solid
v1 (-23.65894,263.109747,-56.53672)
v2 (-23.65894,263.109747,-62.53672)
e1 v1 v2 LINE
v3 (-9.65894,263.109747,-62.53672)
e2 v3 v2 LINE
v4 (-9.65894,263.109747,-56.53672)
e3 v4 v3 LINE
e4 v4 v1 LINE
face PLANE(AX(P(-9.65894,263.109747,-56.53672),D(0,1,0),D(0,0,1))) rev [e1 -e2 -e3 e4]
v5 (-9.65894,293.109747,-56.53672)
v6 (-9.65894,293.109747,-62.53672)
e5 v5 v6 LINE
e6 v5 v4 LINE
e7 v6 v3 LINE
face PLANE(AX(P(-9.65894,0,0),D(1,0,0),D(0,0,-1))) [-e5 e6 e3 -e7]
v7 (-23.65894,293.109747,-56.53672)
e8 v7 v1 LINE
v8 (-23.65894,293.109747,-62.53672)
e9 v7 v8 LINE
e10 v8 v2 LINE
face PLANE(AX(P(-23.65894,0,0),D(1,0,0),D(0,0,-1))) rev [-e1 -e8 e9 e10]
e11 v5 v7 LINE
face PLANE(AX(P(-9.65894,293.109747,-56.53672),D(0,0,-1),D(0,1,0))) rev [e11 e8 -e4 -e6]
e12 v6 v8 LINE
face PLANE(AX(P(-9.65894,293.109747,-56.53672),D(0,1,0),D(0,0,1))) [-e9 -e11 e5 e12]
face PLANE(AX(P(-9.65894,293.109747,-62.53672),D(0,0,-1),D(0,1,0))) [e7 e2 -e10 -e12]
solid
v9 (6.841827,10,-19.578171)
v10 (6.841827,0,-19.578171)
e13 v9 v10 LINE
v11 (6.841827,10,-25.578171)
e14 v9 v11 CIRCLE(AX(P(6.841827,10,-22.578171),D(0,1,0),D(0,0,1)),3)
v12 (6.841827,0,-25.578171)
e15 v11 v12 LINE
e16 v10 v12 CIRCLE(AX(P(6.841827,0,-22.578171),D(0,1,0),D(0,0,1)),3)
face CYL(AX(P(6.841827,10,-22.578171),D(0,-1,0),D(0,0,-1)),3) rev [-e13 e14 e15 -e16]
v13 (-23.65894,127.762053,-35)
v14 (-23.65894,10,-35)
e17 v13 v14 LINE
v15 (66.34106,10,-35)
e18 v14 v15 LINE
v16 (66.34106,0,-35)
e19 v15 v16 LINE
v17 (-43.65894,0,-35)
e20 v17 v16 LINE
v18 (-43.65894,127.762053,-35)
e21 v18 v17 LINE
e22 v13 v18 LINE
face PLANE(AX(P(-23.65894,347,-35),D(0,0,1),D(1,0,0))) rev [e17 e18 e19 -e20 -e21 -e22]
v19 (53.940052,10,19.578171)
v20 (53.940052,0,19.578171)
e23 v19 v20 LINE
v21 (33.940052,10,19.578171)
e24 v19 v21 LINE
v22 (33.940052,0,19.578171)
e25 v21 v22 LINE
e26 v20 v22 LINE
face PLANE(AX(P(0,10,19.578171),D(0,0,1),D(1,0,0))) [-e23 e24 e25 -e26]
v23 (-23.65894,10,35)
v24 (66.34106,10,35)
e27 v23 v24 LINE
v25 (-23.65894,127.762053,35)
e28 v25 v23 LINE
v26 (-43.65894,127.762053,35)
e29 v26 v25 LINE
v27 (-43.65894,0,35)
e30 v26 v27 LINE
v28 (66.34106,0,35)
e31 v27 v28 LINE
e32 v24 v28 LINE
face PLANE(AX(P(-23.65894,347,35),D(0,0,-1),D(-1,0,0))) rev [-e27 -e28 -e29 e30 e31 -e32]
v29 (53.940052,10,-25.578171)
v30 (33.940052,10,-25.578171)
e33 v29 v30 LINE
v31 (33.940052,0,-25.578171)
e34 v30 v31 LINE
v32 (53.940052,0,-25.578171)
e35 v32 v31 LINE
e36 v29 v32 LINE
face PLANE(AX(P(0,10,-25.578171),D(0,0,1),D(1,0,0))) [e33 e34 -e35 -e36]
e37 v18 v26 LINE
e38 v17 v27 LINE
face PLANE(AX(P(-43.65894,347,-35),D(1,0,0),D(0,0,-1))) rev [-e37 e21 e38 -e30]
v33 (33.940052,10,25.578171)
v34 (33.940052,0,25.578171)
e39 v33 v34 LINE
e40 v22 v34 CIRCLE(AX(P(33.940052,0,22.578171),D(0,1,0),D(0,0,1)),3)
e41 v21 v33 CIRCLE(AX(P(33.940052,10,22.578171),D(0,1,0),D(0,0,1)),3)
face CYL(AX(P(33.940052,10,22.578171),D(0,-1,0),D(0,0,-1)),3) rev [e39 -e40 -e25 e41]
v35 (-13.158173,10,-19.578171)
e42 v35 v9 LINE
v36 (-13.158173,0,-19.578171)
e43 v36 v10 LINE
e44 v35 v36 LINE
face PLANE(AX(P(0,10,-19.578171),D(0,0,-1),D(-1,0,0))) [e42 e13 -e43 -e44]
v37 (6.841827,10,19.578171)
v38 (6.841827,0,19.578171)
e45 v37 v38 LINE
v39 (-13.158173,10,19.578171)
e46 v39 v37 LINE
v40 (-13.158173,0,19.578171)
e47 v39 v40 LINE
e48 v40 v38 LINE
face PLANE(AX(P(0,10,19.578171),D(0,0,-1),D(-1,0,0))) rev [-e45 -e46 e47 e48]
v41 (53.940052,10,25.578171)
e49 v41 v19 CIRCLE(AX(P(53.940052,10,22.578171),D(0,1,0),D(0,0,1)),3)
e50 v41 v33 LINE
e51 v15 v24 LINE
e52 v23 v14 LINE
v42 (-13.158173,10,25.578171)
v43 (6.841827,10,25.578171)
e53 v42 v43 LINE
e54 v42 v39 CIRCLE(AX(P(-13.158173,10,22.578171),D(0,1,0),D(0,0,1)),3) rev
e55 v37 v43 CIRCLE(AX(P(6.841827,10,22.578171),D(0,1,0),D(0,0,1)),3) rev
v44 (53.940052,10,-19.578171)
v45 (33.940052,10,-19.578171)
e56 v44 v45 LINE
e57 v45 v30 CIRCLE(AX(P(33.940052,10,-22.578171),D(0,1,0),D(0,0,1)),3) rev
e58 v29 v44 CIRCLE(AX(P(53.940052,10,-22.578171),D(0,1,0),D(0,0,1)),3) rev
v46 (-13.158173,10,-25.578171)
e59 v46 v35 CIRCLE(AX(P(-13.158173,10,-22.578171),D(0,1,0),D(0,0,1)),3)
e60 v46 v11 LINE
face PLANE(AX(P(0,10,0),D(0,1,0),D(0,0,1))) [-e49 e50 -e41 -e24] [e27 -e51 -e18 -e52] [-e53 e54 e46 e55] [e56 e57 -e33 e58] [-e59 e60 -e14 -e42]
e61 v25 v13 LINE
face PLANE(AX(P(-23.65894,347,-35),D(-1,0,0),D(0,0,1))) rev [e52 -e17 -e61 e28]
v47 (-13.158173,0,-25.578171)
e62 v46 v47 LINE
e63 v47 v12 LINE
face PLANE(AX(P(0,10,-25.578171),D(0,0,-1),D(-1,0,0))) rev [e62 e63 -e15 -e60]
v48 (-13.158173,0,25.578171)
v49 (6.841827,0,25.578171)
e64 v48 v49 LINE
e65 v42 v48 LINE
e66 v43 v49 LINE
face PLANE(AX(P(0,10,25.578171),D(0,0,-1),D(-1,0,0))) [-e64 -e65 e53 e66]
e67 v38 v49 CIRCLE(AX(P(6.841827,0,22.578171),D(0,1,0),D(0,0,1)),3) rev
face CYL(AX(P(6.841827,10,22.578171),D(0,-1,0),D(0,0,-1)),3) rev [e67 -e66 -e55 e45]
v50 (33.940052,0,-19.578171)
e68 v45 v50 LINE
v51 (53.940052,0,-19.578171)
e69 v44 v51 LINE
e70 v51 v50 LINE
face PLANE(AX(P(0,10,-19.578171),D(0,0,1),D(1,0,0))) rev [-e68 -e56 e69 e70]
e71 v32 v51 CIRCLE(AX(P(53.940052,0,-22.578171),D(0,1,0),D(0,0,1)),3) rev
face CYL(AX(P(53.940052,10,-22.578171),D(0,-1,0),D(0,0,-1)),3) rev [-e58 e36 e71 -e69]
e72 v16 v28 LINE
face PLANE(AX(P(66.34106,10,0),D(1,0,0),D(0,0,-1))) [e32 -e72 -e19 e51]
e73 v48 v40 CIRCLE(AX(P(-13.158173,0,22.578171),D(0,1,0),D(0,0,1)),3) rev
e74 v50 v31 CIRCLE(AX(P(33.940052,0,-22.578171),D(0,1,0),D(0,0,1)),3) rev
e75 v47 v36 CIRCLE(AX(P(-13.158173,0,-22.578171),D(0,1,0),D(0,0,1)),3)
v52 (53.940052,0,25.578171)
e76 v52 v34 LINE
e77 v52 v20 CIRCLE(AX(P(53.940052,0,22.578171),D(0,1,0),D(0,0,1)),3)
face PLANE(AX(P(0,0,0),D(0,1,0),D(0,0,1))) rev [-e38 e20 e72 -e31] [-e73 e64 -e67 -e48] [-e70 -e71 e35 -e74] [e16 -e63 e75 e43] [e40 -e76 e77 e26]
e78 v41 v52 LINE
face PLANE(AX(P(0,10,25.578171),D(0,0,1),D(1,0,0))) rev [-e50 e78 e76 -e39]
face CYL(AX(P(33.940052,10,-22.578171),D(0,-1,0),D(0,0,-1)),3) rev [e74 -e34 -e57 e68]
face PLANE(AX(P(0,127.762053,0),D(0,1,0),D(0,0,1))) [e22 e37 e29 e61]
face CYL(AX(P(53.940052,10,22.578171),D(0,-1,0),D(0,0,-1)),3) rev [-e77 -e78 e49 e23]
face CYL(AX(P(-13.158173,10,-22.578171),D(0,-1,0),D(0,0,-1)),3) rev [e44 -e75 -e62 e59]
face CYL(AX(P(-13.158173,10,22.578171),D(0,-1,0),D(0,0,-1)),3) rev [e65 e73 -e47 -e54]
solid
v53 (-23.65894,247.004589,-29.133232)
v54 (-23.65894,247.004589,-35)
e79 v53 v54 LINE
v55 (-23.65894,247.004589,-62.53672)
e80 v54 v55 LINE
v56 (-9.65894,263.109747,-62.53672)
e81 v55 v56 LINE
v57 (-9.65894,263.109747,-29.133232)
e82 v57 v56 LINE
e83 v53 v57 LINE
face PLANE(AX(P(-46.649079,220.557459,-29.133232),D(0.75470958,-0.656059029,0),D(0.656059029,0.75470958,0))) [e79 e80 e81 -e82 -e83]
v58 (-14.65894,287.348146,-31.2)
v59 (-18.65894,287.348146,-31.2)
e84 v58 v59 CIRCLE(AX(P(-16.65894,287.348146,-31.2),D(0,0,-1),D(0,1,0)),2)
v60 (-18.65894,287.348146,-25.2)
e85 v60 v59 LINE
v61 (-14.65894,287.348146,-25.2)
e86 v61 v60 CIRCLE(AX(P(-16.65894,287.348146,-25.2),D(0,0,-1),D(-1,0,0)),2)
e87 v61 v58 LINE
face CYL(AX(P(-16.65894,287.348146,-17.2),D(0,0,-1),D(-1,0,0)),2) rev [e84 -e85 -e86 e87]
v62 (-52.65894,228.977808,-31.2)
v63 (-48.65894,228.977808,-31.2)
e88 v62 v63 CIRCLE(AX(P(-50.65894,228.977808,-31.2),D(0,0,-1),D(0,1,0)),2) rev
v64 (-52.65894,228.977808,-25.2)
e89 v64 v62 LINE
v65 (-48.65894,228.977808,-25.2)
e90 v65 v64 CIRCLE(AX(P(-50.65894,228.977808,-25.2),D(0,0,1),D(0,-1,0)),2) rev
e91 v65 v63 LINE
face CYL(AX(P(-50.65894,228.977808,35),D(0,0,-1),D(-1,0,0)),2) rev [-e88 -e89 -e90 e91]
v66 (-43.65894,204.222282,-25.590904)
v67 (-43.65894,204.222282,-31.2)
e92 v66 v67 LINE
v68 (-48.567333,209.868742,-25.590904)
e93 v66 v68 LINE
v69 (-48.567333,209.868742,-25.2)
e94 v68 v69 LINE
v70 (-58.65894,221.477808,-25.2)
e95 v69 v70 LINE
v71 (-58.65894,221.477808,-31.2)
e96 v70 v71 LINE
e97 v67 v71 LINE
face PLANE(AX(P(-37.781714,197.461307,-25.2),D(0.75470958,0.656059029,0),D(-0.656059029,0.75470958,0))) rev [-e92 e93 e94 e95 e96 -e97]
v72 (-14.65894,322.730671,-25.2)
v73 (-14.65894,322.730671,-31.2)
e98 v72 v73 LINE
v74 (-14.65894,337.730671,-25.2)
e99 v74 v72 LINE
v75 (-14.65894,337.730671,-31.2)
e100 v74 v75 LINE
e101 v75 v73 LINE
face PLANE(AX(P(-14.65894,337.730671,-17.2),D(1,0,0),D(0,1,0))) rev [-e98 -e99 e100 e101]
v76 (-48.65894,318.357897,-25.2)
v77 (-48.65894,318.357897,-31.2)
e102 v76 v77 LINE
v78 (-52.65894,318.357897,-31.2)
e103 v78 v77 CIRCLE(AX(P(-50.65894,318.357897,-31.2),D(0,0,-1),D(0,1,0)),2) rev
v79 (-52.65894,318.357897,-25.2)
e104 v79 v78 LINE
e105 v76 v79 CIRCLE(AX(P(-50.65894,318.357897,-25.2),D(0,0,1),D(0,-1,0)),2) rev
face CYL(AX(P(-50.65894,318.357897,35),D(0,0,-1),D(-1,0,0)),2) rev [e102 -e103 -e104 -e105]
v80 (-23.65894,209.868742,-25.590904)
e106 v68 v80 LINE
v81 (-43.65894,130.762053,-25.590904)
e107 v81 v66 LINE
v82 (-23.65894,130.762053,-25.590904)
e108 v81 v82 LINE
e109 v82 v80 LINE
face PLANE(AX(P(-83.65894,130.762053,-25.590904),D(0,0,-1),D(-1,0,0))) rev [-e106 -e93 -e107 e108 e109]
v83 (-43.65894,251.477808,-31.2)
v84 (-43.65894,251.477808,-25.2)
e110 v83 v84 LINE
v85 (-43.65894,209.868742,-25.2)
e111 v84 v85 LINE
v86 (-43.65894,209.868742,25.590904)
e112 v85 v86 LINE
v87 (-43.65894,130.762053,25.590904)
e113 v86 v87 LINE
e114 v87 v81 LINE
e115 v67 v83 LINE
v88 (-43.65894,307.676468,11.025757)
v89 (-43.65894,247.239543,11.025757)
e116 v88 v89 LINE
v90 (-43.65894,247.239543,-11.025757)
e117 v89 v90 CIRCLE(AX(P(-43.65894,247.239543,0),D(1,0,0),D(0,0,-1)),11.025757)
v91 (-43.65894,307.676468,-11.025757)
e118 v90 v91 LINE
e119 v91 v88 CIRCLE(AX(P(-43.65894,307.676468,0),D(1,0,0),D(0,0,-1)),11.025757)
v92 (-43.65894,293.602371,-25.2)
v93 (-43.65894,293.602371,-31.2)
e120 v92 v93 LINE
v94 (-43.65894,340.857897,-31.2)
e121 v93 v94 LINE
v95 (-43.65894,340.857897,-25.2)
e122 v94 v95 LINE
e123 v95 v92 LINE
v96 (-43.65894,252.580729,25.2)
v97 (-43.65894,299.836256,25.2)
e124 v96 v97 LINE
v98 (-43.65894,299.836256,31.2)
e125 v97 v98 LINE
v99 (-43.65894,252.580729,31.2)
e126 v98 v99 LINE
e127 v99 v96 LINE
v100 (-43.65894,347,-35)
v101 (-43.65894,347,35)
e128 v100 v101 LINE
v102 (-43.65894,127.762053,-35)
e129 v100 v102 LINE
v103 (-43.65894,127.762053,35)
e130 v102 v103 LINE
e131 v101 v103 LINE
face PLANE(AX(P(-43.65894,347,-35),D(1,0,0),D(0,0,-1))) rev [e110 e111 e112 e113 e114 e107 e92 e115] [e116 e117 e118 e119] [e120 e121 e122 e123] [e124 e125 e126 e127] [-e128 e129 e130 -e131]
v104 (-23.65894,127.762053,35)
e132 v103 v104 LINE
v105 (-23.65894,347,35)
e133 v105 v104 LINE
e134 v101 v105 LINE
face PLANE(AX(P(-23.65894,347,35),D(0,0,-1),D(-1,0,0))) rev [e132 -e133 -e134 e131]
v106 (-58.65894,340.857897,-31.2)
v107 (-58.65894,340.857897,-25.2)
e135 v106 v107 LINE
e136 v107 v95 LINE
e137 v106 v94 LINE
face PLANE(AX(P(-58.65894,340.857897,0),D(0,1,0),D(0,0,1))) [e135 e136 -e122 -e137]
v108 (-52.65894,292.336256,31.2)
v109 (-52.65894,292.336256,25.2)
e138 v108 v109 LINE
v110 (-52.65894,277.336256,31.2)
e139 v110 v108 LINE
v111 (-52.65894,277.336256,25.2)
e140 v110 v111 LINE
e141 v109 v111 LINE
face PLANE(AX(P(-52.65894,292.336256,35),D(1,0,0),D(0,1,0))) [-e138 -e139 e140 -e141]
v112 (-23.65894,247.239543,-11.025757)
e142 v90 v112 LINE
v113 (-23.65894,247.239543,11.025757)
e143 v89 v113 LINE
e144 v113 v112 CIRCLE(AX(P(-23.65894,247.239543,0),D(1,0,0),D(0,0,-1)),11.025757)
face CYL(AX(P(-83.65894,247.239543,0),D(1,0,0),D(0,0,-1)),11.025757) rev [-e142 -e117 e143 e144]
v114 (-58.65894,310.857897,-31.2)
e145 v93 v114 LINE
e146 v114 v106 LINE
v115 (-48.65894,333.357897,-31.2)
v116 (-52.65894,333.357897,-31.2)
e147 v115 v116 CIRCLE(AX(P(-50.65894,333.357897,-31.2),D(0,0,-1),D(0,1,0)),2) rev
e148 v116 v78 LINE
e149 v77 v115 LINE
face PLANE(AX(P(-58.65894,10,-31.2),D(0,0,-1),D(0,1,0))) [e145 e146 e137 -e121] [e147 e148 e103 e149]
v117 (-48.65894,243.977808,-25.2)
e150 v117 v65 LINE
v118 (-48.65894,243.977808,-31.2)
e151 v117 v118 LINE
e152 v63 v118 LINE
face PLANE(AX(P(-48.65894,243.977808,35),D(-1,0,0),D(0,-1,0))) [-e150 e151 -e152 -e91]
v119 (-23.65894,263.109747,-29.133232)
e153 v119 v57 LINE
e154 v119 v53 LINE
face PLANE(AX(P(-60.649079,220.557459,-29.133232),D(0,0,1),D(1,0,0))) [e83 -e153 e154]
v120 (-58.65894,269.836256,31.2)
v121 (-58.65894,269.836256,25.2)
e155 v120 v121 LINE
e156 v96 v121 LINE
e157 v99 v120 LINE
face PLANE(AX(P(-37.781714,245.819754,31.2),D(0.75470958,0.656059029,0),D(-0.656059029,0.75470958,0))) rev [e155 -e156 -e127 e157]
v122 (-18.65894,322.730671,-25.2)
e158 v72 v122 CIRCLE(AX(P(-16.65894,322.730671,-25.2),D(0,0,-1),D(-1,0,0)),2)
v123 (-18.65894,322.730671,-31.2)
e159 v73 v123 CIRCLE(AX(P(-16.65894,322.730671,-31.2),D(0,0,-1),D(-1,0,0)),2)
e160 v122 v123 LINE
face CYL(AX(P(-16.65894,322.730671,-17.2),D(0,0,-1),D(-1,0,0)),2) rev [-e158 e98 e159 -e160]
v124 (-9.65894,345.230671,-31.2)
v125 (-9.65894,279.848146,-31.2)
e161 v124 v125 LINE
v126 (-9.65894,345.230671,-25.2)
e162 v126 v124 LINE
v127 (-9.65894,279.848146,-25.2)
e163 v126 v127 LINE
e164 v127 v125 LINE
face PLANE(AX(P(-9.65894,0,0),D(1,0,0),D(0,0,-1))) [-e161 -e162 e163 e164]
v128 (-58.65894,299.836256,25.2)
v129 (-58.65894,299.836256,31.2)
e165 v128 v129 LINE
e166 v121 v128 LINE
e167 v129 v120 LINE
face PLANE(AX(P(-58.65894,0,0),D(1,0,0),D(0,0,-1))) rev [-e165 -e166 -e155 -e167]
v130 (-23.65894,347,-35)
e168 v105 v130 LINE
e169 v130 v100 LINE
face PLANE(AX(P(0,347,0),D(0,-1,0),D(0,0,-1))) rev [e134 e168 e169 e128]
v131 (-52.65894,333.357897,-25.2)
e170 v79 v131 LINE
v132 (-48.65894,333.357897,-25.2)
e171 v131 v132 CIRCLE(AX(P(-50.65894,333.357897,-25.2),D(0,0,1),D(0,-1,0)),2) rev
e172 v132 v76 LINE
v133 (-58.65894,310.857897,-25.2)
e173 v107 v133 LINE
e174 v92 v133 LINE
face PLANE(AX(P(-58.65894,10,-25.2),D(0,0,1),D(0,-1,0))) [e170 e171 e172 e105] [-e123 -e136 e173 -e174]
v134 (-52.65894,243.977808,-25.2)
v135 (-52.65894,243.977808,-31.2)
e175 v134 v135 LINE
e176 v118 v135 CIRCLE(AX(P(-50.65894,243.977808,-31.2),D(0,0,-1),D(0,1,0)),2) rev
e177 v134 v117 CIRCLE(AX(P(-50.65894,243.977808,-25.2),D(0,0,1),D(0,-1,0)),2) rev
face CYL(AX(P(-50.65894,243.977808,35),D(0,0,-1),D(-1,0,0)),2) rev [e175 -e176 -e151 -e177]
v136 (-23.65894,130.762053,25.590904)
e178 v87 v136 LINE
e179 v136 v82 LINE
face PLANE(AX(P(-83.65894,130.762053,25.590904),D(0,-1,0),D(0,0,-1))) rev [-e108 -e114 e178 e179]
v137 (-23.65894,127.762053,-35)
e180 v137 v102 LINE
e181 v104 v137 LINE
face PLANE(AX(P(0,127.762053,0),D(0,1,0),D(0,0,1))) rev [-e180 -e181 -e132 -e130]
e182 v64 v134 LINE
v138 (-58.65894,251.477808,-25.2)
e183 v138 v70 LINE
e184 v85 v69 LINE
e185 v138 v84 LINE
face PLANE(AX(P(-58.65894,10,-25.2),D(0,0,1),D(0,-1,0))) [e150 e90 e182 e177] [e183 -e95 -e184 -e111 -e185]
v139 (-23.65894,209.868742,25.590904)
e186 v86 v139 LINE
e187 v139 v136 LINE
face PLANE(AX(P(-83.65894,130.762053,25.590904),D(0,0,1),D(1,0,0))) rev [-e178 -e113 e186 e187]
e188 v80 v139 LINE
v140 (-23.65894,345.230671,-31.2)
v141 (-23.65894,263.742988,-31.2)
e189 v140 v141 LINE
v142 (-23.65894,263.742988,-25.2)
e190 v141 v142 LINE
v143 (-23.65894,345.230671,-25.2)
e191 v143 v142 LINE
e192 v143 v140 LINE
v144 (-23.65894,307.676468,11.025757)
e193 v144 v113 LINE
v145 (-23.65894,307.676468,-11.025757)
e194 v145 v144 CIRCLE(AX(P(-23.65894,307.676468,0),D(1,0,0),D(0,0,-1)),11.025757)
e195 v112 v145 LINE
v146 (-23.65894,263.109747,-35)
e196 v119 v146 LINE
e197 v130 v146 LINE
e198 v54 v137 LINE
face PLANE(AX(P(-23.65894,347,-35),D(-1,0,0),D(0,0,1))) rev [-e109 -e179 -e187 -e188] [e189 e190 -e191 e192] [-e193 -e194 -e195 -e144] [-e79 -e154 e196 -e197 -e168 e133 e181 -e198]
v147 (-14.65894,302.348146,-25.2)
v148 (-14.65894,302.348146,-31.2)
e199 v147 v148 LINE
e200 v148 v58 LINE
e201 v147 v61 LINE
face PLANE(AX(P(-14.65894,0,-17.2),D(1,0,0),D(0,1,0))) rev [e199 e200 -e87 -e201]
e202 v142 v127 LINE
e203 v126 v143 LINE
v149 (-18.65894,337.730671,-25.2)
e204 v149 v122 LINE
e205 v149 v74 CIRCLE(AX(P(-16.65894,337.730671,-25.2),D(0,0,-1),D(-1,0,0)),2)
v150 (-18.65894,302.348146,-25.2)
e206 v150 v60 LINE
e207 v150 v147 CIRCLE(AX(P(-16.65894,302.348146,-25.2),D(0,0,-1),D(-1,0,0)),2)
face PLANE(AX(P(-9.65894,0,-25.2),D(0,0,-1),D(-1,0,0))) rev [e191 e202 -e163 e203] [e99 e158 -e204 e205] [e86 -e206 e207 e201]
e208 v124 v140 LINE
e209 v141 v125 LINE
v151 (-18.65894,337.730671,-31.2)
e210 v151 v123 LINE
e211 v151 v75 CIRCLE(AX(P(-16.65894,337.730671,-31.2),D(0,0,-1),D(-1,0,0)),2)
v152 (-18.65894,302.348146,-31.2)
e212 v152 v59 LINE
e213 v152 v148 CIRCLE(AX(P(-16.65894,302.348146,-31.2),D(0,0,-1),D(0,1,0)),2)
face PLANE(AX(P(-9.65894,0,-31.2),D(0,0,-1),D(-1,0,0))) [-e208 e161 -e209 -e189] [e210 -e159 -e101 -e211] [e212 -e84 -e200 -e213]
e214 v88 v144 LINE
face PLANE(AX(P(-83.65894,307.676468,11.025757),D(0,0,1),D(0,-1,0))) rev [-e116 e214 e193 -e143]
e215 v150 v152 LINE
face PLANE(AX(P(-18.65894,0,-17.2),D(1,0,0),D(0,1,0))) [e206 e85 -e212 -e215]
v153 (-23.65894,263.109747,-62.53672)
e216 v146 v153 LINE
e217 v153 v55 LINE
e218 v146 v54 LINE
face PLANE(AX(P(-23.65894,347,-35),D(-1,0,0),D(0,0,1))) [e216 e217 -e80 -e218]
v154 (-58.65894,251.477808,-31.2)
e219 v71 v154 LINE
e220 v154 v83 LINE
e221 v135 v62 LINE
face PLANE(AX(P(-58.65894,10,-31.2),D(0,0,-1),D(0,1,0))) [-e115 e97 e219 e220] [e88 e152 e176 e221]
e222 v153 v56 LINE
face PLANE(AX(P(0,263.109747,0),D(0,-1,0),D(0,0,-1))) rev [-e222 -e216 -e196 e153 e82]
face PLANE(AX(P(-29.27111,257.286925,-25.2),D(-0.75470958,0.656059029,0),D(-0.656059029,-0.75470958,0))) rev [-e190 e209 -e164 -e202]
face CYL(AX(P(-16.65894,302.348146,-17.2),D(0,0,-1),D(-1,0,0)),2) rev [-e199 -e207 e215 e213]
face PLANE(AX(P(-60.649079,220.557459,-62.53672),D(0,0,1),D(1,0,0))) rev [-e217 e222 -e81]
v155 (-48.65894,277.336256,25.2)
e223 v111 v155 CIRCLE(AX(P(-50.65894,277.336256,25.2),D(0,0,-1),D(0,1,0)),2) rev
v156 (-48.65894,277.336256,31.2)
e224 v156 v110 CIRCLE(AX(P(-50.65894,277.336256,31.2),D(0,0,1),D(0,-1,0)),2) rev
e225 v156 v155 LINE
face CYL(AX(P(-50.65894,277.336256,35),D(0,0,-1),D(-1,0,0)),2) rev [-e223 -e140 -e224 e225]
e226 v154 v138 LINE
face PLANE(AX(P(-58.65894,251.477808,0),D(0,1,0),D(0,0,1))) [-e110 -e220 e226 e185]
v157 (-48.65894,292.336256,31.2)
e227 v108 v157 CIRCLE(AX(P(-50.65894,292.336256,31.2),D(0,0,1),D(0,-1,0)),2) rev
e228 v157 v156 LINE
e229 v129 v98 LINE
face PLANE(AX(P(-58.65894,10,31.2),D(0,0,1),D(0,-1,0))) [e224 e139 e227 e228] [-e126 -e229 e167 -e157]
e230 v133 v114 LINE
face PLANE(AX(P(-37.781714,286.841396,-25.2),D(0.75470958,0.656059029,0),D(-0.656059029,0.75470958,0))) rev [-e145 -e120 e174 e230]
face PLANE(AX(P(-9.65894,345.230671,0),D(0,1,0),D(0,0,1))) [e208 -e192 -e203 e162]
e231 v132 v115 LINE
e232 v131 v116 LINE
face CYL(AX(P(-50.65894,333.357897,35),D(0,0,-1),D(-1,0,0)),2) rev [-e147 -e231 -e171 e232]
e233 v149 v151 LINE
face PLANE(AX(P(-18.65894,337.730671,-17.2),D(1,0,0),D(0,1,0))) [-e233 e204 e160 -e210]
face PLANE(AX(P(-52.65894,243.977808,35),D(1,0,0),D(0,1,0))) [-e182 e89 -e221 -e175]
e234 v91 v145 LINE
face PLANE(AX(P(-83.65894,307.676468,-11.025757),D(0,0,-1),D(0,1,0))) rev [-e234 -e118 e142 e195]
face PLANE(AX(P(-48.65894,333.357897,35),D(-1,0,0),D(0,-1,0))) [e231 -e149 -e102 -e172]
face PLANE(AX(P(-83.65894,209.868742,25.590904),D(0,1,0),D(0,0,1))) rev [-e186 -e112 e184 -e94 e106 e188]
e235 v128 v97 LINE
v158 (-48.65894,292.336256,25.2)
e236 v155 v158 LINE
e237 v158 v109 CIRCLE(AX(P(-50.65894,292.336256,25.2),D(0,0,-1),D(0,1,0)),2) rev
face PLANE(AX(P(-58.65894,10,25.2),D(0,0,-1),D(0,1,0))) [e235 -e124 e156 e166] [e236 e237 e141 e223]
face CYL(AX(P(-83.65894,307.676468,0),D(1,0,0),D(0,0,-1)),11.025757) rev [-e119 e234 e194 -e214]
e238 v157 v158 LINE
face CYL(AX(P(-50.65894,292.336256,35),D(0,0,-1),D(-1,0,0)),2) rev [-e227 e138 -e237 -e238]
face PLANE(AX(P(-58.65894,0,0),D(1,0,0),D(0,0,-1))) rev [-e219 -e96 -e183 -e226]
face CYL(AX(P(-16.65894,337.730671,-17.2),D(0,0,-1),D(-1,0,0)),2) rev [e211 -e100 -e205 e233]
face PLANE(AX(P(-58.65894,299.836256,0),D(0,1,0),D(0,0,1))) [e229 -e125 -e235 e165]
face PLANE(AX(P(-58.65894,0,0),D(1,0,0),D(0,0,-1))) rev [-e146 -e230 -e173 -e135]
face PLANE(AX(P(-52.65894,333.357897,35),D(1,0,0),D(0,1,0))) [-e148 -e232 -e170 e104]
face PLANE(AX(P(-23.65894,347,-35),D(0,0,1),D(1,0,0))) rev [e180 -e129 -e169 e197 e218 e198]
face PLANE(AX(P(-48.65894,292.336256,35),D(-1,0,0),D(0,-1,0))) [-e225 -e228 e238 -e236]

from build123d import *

# Parameters (mm, degrees)
SKETCH1_W               = 20
SKETCH1_H               = 70
SKETCH1_W_2             = 90
BOSS_EXTRUDE1_DEPTH     = 10
SKETCH1_3_W             = 20
SKETCH1_3_H             = 70
BOSS_EXTRUDE2_DEPTH     = 212
BOSS_EXTRUDE3_START     = -20
SKETCH2_W               = 6
SKETCH2_H               = 30
BOSS_EXTRUDE3_DEPTH     = 15
BOSS_EXTRUDE3_2_DEPTH   = 15
BOSS_EXTRUDE3_3_DEPTH   = 15
CUT_EXTRUDE3_DEPTH      = 353.433372815
CUT_EXTRUDE3_DEPTH_BACK = 127.2
SKETCH7_W               = 20
SKETCH7_H               = 70
BOSS_EXTRUDE4_DEPTH     = 135
SKETCH12_W              = 15
SKETCH12_H              = 6
BOSS_EXTRUDE6_DEPTH     = 24.325180813
BOSS_EXTRUDE7_START     = -31.2
BOSS_EXTRUDE7_DEPTH     = 6
BOSS_EXTRUDE8_START     = -31.2
BOSS_EXTRUDE8_DEPTH     = 6
SKETCH3_W               = 51.18180782
SKETCH3_H               = 79.106689165
CUT_EXTRUDE1_DEPTH      = 60
SKETCH17_W              = 6
SKETCH17_H              = 30
BOSS_EXTRUDE9_DEPTH     = 14
CUT_EXTRUDE4_DEPTH      = 14
BOSS_EXTRUDE11_START    = -62.536720157
BOSS_EXTRUDE11_DEPTH    = 33.403488582
SKETCH23_W              = 14
SKETCH23_H              = 6
BOSS_EXTRUDE12_DEPTH    = 28.275172031
SKETCH24_W              = 14
SKETCH24_H              = 6
BOSS_EXTRUDE13_DEPTH    = 5.382525931


with BuildPart() as part:
    # Sketch1 → Boss-Extrude1 (new body)
    # profile 1 of 2: a face of its own
    with BuildSketch(Plane(origin=(0, 0, 0), x_dir=(1, 0, 0), z_dir=(0, 1, 0))):
        with Locations((-33.658940342, 0)):
            Rectangle(SKETCH1_W, SKETCH1_H)
    # profile 2 of 2: a face of its own
    with BuildSketch(Plane(origin=(0, 0, 0), x_dir=(1, 0, 0), z_dir=(0, 1, 0))):
        with Locations((21.341059658, 0)):
            Rectangle(SKETCH1_W_2, SKETCH1_H)
        with BuildLine():
            Line((6.841826819, -25.578170589), (-13.158173181, -25.578170589))
            ThreePointArc((-13.158173181, -25.578170589), (-16.158173181, -22.578170589), (-13.158173181, -19.578170589))
            Line((-13.158173181, -19.578170589), (6.841826819, -19.578170589))
            ThreePointArc((6.841826819, -19.578170589), (9.841826819, -22.578170589), (6.841826819, -25.578170589))
        make_face(mode=Mode.SUBTRACT)
        with BuildLine():
            ThreePointArc((53.940052041, -19.578170589), (56.940052041, -22.578170589), (53.940052041, -25.578170589))
            Line((53.940052041, -25.578170589), (33.940052041, -25.578170589))
            ThreePointArc((33.940052041, -25.578170589), (30.940052041, -22.578170589), (33.940052041, -19.578170589))
            Line((33.940052041, -19.578170589), (53.940052041, -19.578170589))
        make_face(mode=Mode.SUBTRACT)
        with BuildLine():
            ThreePointArc((-13.158173181, 19.578170589), (-16.158173181, 22.578170589), (-13.158173181, 25.578170589))
            Line((-13.158173181, 25.578170589), (6.841826819, 25.578170589))
            ThreePointArc((6.841826819, 25.578170589), (9.841826819, 22.578170589), (6.841826819, 19.578170589))
            Line((6.841826819, 19.578170589), (-13.158173181, 19.578170589))
        make_face(mode=Mode.SUBTRACT)
        with BuildLine():
            Line((33.940052041, 25.578170589), (53.940052041, 25.578170589))
            ThreePointArc((53.940052041, 25.578170589), (56.940052041, 22.578170589), (53.940052041, 19.578170589))
            Line((53.940052041, 19.578170589), (33.940052041, 19.578170589))
            ThreePointArc((33.940052041, 19.578170589), (30.940052041, 22.578170589), (33.940052041, 25.578170589))
        make_face(mode=Mode.SUBTRACT)
    extrude(amount=BOSS_EXTRUDE1_DEPTH)

    # Sketch1<3> → Boss-Extrude2 (add)
    with BuildSketch(Plane(origin=(0, 0, 0), x_dir=(1, 0, 0), z_dir=(0, 1, 0))):
        with Locations((-33.658940342, 0)):
            Rectangle(SKETCH1_3_W, SKETCH1_3_H)
    extrude(amount=BOSS_EXTRUDE2_DEPTH)


with BuildPart() as body_2:
    # Sketch2 → Boss-Extrude3 (new body)
    with BuildSketch(Plane(origin=(-23.658940342, 0, 0), x_dir=(0, 0, -1), z_dir=(1, 0, 0)).offset(BOSS_EXTRUDE3_START)):
        with Locations((-28.2, 284.836255525)):
            Rectangle(SKETCH2_W, SKETCH2_H)
    extrude(amount=-BOSS_EXTRUDE3_DEPTH)


with BuildPart() as body_3:
    # Sketch2 → Boss-Extrude3 2 (new body)
    with BuildSketch(Plane(origin=(-23.658940342, 0, 0), x_dir=(0, 0, -1), z_dir=(1, 0, 0)).offset(BOSS_EXTRUDE3_START)):
        with Locations((28.2, 236.477808494)):
            Rectangle(SKETCH2_W, SKETCH2_H)
    extrude(amount=-BOSS_EXTRUDE3_2_DEPTH)


with BuildPart() as body_4:
    # Sketch2 → Boss-Extrude3 3 (new body)
    with BuildSketch(Plane(origin=(-23.658940342, 0, 0), x_dir=(0, 0, -1), z_dir=(1, 0, 0)).offset(BOSS_EXTRUDE3_START)):
        with Locations((28.2, 325.85789719)):
            Rectangle(SKETCH2_W, SKETCH2_H)
    extrude(amount=-BOSS_EXTRUDE3_3_DEPTH)


with BuildPart() as cut_extrude3_tool:
    # Sketch5 → Cut-Extrude3 (new, two sides: drawn at the far end of the back side and taken through both)
    with BuildSketch(Plane.XY.offset(-25.2).offset(-CUT_EXTRUDE3_DEPTH_BACK)):
        with BuildLine():
            Line((-48.658940342, 292.336255525), (-48.658940342, 277.336255525))
            ThreePointArc((-48.658940342, 277.336255525), (-50.658940342, 275.336255525), (-52.658940342, 277.336255525))
            Line((-52.658940342, 277.336255525), (-52.658940342, 292.336255525))
            ThreePointArc((-52.658940342, 292.336255525), (-50.658940342, 294.336255525), (-48.658940342, 292.336255525))
        make_face()
        with BuildLine():
            Line((-48.658940342, 243.977808494), (-48.658940342, 228.977808494))
            ThreePointArc((-48.658940342, 228.977808494), (-50.658940342, 226.977808494), (-52.658940342, 228.977808494))
            Line((-52.658940342, 228.977808494), (-52.658940342, 243.977808494))
            ThreePointArc((-52.658940342, 243.977808494), (-50.658940342, 245.977808494), (-48.658940342, 243.977808494))
        make_face()
        with BuildLine():
            Line((-48.658940342, 333.35789719), (-48.658940342, 318.35789719))
            ThreePointArc((-48.658940342, 318.35789719), (-50.658940342, 316.35789719), (-52.658940342, 318.35789719))
            Line((-52.658940342, 318.35789719), (-52.658940342, 333.35789719))
            ThreePointArc((-52.658940342, 333.35789719), (-50.658940342, 335.35789719), (-48.658940342, 333.35789719))
        make_face()
    extrude(amount=CUT_EXTRUDE3_DEPTH + CUT_EXTRUDE3_DEPTH_BACK)


with BuildPart() as body_2_1:
    add(body_2.part)

    # Cut-Extrude3: cut by cut_extrude3_tool
    add(cut_extrude3_tool.part, mode=Mode.SUBTRACT)



with BuildPart() as body_3_1:
    add(body_3.part)

    # Cut-Extrude3: cut by cut_extrude3_tool
    add(cut_extrude3_tool.part, mode=Mode.SUBTRACT)


with BuildPart() as body_4_1:
    add(body_4.part)

    # Cut-Extrude3: cut by cut_extrude3_tool
    add(cut_extrude3_tool.part, mode=Mode.SUBTRACT)


with BuildPart() as body_2_2:
    add(body_2_1.part)

    add(body_4_1.part)  # Boss-Extrude4 merges body 4

    add(part.part)  # Boss-Extrude4 merges part
    # Sketch7 → Boss-Extrude4 (add)
    with BuildSketch(Plane(origin=(0, 212, 0), x_dir=(1, 0, 0), z_dir=(0, 1, 0))):
        with Locations((-33.658940342, 0)):
            Rectangle(SKETCH7_W, SKETCH7_H)
    extrude(amount=BOSS_EXTRUDE4_DEPTH)

    # Sketch12 → Boss-Extrude6 (add, along a direction that is not the sketch's normal)
    with BuildSketch(Plane.XZ.offset(-269.836255525)):
        with Locations((-51.158940342, 28.2)):
            Rectangle(SKETCH12_W, SKETCH12_H)
    extrude(amount=BOSS_EXTRUDE6_DEPTH, dir=(0.6560590289905114, -0.7547095802227685, 0))

    # Boss-Extrude7: read off the stored shape, not the designer's step
    # Boss-Extrude7 outline → Boss-Extrude7 (add)
    with BuildSketch(Plane.XY.offset(BOSS_EXTRUDE7_START)):
        Polygon((-58.658940342, 310.85789719), (-43.658940342, 293.602371082), (-43.658940342, 310.85789719), align=None)
    extrude(amount=BOSS_EXTRUDE7_DEPTH)


    add(body_3_1.part)  # Boss-Extrude8 merges body 3
    # Boss-Extrude8: read off the stored shape, not the designer's step
    # Boss-Extrude8 outline → Boss-Extrude8 (add)
    with BuildSketch(Plane.XY.offset(BOSS_EXTRUDE8_START)):
        Polygon((-58.658940342, 221.477808494), (-43.658940342, 204.222282386), (-43.658940342, 221.477808494), align=None)
    extrude(amount=BOSS_EXTRUDE8_DEPTH)

    # Sketch3 → Cut-Extrude1 (cut)
    with BuildSketch(Plane(origin=(-23.658940342, 0, 0), x_dir=(0, 0, -1), z_dir=(1, 0, 0))):
        with Locations((0, 170.315397104)):
            Rectangle(SKETCH3_W, SKETCH3_H)
        with BuildLine():
            Line((11.025757264, 307.676468372), (11.025757264, 247.23954324))
            ThreePointArc((11.025757264, 247.23954324), (0, 236.213785975), (-11.025757264, 247.23954324))
            Line((-11.025757264, 247.23954324), (-11.025757264, 307.676468372))
            ThreePointArc((-11.025757264, 307.676468372), (0, 318.702225636), (11.025757264, 307.676468372))
        make_face()
    extrude(amount=-CUT_EXTRUDE1_DEPTH, mode=Mode.SUBTRACT)

    # Sketch17 → Boss-Extrude9 (add)
    with BuildSketch(Plane(origin=(-23.658940342, 0, 0), x_dir=(0, 0, -1), z_dir=(1, 0, 0))):
        with Locations((28.2, 330.230671493)):
            Rectangle(SKETCH17_W, SKETCH17_H)
        with Locations((28.2, 294.848145562)):
            Rectangle(SKETCH17_W, SKETCH17_H)
        with Locations((59.536720157, 278.109746531)):
            Rectangle(SKETCH17_W, SKETCH17_H)
    extrude(amount=BOSS_EXTRUDE9_DEPTH)


with BuildPart() as boss_extrude9_piece_1:
    # of the separate pieces the step leaves, piece 1, a body of its own (boss_extrude9_pieces)
    add(body_2_2.part.solids().sort_by_distance((-43.658940342, 0, -35))[0])

    # Sketch18 → Cut-Extrude4 (cut)
    with BuildSketch(Plane(origin=(0, 0, -31.2), x_dir=(-1, 0, 0), z_dir=(0, 0, -1))):
        with BuildLine():
            Line((14.658940342, 302.348145562), (14.658940342, 287.348145562))
            ThreePointArc((14.658940342, 287.348145562), (16.658940342, 285.348145562), (18.658940342, 287.348145562))
            Line((18.658940342, 287.348145562), (18.658940342, 302.348145562))
            ThreePointArc((18.658940342, 302.348145562), (16.658940342, 304.348145562), (14.658940342, 302.348145562))
        make_face()
        with BuildLine():
            ThreePointArc((18.658940342, 337.730671493), (16.658940342, 339.730671493), (14.658940342, 337.730671493))
            Line((14.658940342, 337.730671493), (14.658940342, 322.730671493))
            ThreePointArc((14.658940342, 322.730671493), (16.658940342, 320.730671493), (18.658940342, 322.730671493))
            Line((18.658940342, 322.730671493), (18.658940342, 337.730671493))
        make_face()
    extrude(amount=-CUT_EXTRUDE4_DEPTH, mode=Mode.SUBTRACT)


with BuildPart() as boss_extrude9_piece_2:
    # of the separate pieces the step leaves, piece 2, a body of its own (boss_extrude9_pieces)
    add(body_2_2.part.solids().sort_by_distance((-23.658940342, 293.109746531, -56.536720157))[0])


with BuildPart() as body_3_2:
    # Intersect1: read off the stored shape, not the designer's step
    # Intersect1: the piece on the far side of the plane
    add(boss_extrude9_piece_1.part)
    split(bisect_by=Plane(origin=(0, 127.762052521, 0), x_dir=(1, 0, 0), z_dir=(0, 1, 0)), keep=Keep.BOTTOM)


with BuildPart() as boss_extrude9_piece_1_1:
    add(boss_extrude9_piece_1.part)

    # Intersect1
    split(bisect_by=Plane(origin=(0, 127.762052521, 0), x_dir=(1, 0, 0), z_dir=(0, 1, 0)), keep=Keep.TOP)

    # Boss-Extrude11: read off the stored shape, not the designer's step
    # Boss-Extrude11 outline → Boss-Extrude11 (add)
    with BuildSketch(Plane.XY.offset(BOSS_EXTRUDE11_START)):
        Polygon((-9.658940342, 263.109746531), (-23.658940342, 263.109746531), (-23.658940342, 247.00458883), align=None)
    extrude(amount=BOSS_EXTRUDE11_DEPTH)

    # Sketch23 → Boss-Extrude12 (add, along a direction that is not the sketch's normal)
    with BuildSketch(Plane.XZ.offset(-279.848145562)):
        with Locations((-16.658940342, -28.2)):
            Rectangle(SKETCH23_W, SKETCH23_H)
    extrude(amount=BOSS_EXTRUDE12_DEPTH, dir=(-0.6560590289905113, -0.7547095802227686, 0))

    # Sketch24 → Boss-Extrude13 (add)
    with BuildSketch(Plane.XZ.offset(-315.230671493)):
        with Locations((-16.658940342, -28.2)):
            Rectangle(SKETCH24_W, SKETCH24_H)
    extrude(amount=BOSS_EXTRUDE13_DEPTH)


solid = Compound([boss_extrude9_piece_2.part, body_3_2.part, boss_extrude9_piece_1_1.part])
